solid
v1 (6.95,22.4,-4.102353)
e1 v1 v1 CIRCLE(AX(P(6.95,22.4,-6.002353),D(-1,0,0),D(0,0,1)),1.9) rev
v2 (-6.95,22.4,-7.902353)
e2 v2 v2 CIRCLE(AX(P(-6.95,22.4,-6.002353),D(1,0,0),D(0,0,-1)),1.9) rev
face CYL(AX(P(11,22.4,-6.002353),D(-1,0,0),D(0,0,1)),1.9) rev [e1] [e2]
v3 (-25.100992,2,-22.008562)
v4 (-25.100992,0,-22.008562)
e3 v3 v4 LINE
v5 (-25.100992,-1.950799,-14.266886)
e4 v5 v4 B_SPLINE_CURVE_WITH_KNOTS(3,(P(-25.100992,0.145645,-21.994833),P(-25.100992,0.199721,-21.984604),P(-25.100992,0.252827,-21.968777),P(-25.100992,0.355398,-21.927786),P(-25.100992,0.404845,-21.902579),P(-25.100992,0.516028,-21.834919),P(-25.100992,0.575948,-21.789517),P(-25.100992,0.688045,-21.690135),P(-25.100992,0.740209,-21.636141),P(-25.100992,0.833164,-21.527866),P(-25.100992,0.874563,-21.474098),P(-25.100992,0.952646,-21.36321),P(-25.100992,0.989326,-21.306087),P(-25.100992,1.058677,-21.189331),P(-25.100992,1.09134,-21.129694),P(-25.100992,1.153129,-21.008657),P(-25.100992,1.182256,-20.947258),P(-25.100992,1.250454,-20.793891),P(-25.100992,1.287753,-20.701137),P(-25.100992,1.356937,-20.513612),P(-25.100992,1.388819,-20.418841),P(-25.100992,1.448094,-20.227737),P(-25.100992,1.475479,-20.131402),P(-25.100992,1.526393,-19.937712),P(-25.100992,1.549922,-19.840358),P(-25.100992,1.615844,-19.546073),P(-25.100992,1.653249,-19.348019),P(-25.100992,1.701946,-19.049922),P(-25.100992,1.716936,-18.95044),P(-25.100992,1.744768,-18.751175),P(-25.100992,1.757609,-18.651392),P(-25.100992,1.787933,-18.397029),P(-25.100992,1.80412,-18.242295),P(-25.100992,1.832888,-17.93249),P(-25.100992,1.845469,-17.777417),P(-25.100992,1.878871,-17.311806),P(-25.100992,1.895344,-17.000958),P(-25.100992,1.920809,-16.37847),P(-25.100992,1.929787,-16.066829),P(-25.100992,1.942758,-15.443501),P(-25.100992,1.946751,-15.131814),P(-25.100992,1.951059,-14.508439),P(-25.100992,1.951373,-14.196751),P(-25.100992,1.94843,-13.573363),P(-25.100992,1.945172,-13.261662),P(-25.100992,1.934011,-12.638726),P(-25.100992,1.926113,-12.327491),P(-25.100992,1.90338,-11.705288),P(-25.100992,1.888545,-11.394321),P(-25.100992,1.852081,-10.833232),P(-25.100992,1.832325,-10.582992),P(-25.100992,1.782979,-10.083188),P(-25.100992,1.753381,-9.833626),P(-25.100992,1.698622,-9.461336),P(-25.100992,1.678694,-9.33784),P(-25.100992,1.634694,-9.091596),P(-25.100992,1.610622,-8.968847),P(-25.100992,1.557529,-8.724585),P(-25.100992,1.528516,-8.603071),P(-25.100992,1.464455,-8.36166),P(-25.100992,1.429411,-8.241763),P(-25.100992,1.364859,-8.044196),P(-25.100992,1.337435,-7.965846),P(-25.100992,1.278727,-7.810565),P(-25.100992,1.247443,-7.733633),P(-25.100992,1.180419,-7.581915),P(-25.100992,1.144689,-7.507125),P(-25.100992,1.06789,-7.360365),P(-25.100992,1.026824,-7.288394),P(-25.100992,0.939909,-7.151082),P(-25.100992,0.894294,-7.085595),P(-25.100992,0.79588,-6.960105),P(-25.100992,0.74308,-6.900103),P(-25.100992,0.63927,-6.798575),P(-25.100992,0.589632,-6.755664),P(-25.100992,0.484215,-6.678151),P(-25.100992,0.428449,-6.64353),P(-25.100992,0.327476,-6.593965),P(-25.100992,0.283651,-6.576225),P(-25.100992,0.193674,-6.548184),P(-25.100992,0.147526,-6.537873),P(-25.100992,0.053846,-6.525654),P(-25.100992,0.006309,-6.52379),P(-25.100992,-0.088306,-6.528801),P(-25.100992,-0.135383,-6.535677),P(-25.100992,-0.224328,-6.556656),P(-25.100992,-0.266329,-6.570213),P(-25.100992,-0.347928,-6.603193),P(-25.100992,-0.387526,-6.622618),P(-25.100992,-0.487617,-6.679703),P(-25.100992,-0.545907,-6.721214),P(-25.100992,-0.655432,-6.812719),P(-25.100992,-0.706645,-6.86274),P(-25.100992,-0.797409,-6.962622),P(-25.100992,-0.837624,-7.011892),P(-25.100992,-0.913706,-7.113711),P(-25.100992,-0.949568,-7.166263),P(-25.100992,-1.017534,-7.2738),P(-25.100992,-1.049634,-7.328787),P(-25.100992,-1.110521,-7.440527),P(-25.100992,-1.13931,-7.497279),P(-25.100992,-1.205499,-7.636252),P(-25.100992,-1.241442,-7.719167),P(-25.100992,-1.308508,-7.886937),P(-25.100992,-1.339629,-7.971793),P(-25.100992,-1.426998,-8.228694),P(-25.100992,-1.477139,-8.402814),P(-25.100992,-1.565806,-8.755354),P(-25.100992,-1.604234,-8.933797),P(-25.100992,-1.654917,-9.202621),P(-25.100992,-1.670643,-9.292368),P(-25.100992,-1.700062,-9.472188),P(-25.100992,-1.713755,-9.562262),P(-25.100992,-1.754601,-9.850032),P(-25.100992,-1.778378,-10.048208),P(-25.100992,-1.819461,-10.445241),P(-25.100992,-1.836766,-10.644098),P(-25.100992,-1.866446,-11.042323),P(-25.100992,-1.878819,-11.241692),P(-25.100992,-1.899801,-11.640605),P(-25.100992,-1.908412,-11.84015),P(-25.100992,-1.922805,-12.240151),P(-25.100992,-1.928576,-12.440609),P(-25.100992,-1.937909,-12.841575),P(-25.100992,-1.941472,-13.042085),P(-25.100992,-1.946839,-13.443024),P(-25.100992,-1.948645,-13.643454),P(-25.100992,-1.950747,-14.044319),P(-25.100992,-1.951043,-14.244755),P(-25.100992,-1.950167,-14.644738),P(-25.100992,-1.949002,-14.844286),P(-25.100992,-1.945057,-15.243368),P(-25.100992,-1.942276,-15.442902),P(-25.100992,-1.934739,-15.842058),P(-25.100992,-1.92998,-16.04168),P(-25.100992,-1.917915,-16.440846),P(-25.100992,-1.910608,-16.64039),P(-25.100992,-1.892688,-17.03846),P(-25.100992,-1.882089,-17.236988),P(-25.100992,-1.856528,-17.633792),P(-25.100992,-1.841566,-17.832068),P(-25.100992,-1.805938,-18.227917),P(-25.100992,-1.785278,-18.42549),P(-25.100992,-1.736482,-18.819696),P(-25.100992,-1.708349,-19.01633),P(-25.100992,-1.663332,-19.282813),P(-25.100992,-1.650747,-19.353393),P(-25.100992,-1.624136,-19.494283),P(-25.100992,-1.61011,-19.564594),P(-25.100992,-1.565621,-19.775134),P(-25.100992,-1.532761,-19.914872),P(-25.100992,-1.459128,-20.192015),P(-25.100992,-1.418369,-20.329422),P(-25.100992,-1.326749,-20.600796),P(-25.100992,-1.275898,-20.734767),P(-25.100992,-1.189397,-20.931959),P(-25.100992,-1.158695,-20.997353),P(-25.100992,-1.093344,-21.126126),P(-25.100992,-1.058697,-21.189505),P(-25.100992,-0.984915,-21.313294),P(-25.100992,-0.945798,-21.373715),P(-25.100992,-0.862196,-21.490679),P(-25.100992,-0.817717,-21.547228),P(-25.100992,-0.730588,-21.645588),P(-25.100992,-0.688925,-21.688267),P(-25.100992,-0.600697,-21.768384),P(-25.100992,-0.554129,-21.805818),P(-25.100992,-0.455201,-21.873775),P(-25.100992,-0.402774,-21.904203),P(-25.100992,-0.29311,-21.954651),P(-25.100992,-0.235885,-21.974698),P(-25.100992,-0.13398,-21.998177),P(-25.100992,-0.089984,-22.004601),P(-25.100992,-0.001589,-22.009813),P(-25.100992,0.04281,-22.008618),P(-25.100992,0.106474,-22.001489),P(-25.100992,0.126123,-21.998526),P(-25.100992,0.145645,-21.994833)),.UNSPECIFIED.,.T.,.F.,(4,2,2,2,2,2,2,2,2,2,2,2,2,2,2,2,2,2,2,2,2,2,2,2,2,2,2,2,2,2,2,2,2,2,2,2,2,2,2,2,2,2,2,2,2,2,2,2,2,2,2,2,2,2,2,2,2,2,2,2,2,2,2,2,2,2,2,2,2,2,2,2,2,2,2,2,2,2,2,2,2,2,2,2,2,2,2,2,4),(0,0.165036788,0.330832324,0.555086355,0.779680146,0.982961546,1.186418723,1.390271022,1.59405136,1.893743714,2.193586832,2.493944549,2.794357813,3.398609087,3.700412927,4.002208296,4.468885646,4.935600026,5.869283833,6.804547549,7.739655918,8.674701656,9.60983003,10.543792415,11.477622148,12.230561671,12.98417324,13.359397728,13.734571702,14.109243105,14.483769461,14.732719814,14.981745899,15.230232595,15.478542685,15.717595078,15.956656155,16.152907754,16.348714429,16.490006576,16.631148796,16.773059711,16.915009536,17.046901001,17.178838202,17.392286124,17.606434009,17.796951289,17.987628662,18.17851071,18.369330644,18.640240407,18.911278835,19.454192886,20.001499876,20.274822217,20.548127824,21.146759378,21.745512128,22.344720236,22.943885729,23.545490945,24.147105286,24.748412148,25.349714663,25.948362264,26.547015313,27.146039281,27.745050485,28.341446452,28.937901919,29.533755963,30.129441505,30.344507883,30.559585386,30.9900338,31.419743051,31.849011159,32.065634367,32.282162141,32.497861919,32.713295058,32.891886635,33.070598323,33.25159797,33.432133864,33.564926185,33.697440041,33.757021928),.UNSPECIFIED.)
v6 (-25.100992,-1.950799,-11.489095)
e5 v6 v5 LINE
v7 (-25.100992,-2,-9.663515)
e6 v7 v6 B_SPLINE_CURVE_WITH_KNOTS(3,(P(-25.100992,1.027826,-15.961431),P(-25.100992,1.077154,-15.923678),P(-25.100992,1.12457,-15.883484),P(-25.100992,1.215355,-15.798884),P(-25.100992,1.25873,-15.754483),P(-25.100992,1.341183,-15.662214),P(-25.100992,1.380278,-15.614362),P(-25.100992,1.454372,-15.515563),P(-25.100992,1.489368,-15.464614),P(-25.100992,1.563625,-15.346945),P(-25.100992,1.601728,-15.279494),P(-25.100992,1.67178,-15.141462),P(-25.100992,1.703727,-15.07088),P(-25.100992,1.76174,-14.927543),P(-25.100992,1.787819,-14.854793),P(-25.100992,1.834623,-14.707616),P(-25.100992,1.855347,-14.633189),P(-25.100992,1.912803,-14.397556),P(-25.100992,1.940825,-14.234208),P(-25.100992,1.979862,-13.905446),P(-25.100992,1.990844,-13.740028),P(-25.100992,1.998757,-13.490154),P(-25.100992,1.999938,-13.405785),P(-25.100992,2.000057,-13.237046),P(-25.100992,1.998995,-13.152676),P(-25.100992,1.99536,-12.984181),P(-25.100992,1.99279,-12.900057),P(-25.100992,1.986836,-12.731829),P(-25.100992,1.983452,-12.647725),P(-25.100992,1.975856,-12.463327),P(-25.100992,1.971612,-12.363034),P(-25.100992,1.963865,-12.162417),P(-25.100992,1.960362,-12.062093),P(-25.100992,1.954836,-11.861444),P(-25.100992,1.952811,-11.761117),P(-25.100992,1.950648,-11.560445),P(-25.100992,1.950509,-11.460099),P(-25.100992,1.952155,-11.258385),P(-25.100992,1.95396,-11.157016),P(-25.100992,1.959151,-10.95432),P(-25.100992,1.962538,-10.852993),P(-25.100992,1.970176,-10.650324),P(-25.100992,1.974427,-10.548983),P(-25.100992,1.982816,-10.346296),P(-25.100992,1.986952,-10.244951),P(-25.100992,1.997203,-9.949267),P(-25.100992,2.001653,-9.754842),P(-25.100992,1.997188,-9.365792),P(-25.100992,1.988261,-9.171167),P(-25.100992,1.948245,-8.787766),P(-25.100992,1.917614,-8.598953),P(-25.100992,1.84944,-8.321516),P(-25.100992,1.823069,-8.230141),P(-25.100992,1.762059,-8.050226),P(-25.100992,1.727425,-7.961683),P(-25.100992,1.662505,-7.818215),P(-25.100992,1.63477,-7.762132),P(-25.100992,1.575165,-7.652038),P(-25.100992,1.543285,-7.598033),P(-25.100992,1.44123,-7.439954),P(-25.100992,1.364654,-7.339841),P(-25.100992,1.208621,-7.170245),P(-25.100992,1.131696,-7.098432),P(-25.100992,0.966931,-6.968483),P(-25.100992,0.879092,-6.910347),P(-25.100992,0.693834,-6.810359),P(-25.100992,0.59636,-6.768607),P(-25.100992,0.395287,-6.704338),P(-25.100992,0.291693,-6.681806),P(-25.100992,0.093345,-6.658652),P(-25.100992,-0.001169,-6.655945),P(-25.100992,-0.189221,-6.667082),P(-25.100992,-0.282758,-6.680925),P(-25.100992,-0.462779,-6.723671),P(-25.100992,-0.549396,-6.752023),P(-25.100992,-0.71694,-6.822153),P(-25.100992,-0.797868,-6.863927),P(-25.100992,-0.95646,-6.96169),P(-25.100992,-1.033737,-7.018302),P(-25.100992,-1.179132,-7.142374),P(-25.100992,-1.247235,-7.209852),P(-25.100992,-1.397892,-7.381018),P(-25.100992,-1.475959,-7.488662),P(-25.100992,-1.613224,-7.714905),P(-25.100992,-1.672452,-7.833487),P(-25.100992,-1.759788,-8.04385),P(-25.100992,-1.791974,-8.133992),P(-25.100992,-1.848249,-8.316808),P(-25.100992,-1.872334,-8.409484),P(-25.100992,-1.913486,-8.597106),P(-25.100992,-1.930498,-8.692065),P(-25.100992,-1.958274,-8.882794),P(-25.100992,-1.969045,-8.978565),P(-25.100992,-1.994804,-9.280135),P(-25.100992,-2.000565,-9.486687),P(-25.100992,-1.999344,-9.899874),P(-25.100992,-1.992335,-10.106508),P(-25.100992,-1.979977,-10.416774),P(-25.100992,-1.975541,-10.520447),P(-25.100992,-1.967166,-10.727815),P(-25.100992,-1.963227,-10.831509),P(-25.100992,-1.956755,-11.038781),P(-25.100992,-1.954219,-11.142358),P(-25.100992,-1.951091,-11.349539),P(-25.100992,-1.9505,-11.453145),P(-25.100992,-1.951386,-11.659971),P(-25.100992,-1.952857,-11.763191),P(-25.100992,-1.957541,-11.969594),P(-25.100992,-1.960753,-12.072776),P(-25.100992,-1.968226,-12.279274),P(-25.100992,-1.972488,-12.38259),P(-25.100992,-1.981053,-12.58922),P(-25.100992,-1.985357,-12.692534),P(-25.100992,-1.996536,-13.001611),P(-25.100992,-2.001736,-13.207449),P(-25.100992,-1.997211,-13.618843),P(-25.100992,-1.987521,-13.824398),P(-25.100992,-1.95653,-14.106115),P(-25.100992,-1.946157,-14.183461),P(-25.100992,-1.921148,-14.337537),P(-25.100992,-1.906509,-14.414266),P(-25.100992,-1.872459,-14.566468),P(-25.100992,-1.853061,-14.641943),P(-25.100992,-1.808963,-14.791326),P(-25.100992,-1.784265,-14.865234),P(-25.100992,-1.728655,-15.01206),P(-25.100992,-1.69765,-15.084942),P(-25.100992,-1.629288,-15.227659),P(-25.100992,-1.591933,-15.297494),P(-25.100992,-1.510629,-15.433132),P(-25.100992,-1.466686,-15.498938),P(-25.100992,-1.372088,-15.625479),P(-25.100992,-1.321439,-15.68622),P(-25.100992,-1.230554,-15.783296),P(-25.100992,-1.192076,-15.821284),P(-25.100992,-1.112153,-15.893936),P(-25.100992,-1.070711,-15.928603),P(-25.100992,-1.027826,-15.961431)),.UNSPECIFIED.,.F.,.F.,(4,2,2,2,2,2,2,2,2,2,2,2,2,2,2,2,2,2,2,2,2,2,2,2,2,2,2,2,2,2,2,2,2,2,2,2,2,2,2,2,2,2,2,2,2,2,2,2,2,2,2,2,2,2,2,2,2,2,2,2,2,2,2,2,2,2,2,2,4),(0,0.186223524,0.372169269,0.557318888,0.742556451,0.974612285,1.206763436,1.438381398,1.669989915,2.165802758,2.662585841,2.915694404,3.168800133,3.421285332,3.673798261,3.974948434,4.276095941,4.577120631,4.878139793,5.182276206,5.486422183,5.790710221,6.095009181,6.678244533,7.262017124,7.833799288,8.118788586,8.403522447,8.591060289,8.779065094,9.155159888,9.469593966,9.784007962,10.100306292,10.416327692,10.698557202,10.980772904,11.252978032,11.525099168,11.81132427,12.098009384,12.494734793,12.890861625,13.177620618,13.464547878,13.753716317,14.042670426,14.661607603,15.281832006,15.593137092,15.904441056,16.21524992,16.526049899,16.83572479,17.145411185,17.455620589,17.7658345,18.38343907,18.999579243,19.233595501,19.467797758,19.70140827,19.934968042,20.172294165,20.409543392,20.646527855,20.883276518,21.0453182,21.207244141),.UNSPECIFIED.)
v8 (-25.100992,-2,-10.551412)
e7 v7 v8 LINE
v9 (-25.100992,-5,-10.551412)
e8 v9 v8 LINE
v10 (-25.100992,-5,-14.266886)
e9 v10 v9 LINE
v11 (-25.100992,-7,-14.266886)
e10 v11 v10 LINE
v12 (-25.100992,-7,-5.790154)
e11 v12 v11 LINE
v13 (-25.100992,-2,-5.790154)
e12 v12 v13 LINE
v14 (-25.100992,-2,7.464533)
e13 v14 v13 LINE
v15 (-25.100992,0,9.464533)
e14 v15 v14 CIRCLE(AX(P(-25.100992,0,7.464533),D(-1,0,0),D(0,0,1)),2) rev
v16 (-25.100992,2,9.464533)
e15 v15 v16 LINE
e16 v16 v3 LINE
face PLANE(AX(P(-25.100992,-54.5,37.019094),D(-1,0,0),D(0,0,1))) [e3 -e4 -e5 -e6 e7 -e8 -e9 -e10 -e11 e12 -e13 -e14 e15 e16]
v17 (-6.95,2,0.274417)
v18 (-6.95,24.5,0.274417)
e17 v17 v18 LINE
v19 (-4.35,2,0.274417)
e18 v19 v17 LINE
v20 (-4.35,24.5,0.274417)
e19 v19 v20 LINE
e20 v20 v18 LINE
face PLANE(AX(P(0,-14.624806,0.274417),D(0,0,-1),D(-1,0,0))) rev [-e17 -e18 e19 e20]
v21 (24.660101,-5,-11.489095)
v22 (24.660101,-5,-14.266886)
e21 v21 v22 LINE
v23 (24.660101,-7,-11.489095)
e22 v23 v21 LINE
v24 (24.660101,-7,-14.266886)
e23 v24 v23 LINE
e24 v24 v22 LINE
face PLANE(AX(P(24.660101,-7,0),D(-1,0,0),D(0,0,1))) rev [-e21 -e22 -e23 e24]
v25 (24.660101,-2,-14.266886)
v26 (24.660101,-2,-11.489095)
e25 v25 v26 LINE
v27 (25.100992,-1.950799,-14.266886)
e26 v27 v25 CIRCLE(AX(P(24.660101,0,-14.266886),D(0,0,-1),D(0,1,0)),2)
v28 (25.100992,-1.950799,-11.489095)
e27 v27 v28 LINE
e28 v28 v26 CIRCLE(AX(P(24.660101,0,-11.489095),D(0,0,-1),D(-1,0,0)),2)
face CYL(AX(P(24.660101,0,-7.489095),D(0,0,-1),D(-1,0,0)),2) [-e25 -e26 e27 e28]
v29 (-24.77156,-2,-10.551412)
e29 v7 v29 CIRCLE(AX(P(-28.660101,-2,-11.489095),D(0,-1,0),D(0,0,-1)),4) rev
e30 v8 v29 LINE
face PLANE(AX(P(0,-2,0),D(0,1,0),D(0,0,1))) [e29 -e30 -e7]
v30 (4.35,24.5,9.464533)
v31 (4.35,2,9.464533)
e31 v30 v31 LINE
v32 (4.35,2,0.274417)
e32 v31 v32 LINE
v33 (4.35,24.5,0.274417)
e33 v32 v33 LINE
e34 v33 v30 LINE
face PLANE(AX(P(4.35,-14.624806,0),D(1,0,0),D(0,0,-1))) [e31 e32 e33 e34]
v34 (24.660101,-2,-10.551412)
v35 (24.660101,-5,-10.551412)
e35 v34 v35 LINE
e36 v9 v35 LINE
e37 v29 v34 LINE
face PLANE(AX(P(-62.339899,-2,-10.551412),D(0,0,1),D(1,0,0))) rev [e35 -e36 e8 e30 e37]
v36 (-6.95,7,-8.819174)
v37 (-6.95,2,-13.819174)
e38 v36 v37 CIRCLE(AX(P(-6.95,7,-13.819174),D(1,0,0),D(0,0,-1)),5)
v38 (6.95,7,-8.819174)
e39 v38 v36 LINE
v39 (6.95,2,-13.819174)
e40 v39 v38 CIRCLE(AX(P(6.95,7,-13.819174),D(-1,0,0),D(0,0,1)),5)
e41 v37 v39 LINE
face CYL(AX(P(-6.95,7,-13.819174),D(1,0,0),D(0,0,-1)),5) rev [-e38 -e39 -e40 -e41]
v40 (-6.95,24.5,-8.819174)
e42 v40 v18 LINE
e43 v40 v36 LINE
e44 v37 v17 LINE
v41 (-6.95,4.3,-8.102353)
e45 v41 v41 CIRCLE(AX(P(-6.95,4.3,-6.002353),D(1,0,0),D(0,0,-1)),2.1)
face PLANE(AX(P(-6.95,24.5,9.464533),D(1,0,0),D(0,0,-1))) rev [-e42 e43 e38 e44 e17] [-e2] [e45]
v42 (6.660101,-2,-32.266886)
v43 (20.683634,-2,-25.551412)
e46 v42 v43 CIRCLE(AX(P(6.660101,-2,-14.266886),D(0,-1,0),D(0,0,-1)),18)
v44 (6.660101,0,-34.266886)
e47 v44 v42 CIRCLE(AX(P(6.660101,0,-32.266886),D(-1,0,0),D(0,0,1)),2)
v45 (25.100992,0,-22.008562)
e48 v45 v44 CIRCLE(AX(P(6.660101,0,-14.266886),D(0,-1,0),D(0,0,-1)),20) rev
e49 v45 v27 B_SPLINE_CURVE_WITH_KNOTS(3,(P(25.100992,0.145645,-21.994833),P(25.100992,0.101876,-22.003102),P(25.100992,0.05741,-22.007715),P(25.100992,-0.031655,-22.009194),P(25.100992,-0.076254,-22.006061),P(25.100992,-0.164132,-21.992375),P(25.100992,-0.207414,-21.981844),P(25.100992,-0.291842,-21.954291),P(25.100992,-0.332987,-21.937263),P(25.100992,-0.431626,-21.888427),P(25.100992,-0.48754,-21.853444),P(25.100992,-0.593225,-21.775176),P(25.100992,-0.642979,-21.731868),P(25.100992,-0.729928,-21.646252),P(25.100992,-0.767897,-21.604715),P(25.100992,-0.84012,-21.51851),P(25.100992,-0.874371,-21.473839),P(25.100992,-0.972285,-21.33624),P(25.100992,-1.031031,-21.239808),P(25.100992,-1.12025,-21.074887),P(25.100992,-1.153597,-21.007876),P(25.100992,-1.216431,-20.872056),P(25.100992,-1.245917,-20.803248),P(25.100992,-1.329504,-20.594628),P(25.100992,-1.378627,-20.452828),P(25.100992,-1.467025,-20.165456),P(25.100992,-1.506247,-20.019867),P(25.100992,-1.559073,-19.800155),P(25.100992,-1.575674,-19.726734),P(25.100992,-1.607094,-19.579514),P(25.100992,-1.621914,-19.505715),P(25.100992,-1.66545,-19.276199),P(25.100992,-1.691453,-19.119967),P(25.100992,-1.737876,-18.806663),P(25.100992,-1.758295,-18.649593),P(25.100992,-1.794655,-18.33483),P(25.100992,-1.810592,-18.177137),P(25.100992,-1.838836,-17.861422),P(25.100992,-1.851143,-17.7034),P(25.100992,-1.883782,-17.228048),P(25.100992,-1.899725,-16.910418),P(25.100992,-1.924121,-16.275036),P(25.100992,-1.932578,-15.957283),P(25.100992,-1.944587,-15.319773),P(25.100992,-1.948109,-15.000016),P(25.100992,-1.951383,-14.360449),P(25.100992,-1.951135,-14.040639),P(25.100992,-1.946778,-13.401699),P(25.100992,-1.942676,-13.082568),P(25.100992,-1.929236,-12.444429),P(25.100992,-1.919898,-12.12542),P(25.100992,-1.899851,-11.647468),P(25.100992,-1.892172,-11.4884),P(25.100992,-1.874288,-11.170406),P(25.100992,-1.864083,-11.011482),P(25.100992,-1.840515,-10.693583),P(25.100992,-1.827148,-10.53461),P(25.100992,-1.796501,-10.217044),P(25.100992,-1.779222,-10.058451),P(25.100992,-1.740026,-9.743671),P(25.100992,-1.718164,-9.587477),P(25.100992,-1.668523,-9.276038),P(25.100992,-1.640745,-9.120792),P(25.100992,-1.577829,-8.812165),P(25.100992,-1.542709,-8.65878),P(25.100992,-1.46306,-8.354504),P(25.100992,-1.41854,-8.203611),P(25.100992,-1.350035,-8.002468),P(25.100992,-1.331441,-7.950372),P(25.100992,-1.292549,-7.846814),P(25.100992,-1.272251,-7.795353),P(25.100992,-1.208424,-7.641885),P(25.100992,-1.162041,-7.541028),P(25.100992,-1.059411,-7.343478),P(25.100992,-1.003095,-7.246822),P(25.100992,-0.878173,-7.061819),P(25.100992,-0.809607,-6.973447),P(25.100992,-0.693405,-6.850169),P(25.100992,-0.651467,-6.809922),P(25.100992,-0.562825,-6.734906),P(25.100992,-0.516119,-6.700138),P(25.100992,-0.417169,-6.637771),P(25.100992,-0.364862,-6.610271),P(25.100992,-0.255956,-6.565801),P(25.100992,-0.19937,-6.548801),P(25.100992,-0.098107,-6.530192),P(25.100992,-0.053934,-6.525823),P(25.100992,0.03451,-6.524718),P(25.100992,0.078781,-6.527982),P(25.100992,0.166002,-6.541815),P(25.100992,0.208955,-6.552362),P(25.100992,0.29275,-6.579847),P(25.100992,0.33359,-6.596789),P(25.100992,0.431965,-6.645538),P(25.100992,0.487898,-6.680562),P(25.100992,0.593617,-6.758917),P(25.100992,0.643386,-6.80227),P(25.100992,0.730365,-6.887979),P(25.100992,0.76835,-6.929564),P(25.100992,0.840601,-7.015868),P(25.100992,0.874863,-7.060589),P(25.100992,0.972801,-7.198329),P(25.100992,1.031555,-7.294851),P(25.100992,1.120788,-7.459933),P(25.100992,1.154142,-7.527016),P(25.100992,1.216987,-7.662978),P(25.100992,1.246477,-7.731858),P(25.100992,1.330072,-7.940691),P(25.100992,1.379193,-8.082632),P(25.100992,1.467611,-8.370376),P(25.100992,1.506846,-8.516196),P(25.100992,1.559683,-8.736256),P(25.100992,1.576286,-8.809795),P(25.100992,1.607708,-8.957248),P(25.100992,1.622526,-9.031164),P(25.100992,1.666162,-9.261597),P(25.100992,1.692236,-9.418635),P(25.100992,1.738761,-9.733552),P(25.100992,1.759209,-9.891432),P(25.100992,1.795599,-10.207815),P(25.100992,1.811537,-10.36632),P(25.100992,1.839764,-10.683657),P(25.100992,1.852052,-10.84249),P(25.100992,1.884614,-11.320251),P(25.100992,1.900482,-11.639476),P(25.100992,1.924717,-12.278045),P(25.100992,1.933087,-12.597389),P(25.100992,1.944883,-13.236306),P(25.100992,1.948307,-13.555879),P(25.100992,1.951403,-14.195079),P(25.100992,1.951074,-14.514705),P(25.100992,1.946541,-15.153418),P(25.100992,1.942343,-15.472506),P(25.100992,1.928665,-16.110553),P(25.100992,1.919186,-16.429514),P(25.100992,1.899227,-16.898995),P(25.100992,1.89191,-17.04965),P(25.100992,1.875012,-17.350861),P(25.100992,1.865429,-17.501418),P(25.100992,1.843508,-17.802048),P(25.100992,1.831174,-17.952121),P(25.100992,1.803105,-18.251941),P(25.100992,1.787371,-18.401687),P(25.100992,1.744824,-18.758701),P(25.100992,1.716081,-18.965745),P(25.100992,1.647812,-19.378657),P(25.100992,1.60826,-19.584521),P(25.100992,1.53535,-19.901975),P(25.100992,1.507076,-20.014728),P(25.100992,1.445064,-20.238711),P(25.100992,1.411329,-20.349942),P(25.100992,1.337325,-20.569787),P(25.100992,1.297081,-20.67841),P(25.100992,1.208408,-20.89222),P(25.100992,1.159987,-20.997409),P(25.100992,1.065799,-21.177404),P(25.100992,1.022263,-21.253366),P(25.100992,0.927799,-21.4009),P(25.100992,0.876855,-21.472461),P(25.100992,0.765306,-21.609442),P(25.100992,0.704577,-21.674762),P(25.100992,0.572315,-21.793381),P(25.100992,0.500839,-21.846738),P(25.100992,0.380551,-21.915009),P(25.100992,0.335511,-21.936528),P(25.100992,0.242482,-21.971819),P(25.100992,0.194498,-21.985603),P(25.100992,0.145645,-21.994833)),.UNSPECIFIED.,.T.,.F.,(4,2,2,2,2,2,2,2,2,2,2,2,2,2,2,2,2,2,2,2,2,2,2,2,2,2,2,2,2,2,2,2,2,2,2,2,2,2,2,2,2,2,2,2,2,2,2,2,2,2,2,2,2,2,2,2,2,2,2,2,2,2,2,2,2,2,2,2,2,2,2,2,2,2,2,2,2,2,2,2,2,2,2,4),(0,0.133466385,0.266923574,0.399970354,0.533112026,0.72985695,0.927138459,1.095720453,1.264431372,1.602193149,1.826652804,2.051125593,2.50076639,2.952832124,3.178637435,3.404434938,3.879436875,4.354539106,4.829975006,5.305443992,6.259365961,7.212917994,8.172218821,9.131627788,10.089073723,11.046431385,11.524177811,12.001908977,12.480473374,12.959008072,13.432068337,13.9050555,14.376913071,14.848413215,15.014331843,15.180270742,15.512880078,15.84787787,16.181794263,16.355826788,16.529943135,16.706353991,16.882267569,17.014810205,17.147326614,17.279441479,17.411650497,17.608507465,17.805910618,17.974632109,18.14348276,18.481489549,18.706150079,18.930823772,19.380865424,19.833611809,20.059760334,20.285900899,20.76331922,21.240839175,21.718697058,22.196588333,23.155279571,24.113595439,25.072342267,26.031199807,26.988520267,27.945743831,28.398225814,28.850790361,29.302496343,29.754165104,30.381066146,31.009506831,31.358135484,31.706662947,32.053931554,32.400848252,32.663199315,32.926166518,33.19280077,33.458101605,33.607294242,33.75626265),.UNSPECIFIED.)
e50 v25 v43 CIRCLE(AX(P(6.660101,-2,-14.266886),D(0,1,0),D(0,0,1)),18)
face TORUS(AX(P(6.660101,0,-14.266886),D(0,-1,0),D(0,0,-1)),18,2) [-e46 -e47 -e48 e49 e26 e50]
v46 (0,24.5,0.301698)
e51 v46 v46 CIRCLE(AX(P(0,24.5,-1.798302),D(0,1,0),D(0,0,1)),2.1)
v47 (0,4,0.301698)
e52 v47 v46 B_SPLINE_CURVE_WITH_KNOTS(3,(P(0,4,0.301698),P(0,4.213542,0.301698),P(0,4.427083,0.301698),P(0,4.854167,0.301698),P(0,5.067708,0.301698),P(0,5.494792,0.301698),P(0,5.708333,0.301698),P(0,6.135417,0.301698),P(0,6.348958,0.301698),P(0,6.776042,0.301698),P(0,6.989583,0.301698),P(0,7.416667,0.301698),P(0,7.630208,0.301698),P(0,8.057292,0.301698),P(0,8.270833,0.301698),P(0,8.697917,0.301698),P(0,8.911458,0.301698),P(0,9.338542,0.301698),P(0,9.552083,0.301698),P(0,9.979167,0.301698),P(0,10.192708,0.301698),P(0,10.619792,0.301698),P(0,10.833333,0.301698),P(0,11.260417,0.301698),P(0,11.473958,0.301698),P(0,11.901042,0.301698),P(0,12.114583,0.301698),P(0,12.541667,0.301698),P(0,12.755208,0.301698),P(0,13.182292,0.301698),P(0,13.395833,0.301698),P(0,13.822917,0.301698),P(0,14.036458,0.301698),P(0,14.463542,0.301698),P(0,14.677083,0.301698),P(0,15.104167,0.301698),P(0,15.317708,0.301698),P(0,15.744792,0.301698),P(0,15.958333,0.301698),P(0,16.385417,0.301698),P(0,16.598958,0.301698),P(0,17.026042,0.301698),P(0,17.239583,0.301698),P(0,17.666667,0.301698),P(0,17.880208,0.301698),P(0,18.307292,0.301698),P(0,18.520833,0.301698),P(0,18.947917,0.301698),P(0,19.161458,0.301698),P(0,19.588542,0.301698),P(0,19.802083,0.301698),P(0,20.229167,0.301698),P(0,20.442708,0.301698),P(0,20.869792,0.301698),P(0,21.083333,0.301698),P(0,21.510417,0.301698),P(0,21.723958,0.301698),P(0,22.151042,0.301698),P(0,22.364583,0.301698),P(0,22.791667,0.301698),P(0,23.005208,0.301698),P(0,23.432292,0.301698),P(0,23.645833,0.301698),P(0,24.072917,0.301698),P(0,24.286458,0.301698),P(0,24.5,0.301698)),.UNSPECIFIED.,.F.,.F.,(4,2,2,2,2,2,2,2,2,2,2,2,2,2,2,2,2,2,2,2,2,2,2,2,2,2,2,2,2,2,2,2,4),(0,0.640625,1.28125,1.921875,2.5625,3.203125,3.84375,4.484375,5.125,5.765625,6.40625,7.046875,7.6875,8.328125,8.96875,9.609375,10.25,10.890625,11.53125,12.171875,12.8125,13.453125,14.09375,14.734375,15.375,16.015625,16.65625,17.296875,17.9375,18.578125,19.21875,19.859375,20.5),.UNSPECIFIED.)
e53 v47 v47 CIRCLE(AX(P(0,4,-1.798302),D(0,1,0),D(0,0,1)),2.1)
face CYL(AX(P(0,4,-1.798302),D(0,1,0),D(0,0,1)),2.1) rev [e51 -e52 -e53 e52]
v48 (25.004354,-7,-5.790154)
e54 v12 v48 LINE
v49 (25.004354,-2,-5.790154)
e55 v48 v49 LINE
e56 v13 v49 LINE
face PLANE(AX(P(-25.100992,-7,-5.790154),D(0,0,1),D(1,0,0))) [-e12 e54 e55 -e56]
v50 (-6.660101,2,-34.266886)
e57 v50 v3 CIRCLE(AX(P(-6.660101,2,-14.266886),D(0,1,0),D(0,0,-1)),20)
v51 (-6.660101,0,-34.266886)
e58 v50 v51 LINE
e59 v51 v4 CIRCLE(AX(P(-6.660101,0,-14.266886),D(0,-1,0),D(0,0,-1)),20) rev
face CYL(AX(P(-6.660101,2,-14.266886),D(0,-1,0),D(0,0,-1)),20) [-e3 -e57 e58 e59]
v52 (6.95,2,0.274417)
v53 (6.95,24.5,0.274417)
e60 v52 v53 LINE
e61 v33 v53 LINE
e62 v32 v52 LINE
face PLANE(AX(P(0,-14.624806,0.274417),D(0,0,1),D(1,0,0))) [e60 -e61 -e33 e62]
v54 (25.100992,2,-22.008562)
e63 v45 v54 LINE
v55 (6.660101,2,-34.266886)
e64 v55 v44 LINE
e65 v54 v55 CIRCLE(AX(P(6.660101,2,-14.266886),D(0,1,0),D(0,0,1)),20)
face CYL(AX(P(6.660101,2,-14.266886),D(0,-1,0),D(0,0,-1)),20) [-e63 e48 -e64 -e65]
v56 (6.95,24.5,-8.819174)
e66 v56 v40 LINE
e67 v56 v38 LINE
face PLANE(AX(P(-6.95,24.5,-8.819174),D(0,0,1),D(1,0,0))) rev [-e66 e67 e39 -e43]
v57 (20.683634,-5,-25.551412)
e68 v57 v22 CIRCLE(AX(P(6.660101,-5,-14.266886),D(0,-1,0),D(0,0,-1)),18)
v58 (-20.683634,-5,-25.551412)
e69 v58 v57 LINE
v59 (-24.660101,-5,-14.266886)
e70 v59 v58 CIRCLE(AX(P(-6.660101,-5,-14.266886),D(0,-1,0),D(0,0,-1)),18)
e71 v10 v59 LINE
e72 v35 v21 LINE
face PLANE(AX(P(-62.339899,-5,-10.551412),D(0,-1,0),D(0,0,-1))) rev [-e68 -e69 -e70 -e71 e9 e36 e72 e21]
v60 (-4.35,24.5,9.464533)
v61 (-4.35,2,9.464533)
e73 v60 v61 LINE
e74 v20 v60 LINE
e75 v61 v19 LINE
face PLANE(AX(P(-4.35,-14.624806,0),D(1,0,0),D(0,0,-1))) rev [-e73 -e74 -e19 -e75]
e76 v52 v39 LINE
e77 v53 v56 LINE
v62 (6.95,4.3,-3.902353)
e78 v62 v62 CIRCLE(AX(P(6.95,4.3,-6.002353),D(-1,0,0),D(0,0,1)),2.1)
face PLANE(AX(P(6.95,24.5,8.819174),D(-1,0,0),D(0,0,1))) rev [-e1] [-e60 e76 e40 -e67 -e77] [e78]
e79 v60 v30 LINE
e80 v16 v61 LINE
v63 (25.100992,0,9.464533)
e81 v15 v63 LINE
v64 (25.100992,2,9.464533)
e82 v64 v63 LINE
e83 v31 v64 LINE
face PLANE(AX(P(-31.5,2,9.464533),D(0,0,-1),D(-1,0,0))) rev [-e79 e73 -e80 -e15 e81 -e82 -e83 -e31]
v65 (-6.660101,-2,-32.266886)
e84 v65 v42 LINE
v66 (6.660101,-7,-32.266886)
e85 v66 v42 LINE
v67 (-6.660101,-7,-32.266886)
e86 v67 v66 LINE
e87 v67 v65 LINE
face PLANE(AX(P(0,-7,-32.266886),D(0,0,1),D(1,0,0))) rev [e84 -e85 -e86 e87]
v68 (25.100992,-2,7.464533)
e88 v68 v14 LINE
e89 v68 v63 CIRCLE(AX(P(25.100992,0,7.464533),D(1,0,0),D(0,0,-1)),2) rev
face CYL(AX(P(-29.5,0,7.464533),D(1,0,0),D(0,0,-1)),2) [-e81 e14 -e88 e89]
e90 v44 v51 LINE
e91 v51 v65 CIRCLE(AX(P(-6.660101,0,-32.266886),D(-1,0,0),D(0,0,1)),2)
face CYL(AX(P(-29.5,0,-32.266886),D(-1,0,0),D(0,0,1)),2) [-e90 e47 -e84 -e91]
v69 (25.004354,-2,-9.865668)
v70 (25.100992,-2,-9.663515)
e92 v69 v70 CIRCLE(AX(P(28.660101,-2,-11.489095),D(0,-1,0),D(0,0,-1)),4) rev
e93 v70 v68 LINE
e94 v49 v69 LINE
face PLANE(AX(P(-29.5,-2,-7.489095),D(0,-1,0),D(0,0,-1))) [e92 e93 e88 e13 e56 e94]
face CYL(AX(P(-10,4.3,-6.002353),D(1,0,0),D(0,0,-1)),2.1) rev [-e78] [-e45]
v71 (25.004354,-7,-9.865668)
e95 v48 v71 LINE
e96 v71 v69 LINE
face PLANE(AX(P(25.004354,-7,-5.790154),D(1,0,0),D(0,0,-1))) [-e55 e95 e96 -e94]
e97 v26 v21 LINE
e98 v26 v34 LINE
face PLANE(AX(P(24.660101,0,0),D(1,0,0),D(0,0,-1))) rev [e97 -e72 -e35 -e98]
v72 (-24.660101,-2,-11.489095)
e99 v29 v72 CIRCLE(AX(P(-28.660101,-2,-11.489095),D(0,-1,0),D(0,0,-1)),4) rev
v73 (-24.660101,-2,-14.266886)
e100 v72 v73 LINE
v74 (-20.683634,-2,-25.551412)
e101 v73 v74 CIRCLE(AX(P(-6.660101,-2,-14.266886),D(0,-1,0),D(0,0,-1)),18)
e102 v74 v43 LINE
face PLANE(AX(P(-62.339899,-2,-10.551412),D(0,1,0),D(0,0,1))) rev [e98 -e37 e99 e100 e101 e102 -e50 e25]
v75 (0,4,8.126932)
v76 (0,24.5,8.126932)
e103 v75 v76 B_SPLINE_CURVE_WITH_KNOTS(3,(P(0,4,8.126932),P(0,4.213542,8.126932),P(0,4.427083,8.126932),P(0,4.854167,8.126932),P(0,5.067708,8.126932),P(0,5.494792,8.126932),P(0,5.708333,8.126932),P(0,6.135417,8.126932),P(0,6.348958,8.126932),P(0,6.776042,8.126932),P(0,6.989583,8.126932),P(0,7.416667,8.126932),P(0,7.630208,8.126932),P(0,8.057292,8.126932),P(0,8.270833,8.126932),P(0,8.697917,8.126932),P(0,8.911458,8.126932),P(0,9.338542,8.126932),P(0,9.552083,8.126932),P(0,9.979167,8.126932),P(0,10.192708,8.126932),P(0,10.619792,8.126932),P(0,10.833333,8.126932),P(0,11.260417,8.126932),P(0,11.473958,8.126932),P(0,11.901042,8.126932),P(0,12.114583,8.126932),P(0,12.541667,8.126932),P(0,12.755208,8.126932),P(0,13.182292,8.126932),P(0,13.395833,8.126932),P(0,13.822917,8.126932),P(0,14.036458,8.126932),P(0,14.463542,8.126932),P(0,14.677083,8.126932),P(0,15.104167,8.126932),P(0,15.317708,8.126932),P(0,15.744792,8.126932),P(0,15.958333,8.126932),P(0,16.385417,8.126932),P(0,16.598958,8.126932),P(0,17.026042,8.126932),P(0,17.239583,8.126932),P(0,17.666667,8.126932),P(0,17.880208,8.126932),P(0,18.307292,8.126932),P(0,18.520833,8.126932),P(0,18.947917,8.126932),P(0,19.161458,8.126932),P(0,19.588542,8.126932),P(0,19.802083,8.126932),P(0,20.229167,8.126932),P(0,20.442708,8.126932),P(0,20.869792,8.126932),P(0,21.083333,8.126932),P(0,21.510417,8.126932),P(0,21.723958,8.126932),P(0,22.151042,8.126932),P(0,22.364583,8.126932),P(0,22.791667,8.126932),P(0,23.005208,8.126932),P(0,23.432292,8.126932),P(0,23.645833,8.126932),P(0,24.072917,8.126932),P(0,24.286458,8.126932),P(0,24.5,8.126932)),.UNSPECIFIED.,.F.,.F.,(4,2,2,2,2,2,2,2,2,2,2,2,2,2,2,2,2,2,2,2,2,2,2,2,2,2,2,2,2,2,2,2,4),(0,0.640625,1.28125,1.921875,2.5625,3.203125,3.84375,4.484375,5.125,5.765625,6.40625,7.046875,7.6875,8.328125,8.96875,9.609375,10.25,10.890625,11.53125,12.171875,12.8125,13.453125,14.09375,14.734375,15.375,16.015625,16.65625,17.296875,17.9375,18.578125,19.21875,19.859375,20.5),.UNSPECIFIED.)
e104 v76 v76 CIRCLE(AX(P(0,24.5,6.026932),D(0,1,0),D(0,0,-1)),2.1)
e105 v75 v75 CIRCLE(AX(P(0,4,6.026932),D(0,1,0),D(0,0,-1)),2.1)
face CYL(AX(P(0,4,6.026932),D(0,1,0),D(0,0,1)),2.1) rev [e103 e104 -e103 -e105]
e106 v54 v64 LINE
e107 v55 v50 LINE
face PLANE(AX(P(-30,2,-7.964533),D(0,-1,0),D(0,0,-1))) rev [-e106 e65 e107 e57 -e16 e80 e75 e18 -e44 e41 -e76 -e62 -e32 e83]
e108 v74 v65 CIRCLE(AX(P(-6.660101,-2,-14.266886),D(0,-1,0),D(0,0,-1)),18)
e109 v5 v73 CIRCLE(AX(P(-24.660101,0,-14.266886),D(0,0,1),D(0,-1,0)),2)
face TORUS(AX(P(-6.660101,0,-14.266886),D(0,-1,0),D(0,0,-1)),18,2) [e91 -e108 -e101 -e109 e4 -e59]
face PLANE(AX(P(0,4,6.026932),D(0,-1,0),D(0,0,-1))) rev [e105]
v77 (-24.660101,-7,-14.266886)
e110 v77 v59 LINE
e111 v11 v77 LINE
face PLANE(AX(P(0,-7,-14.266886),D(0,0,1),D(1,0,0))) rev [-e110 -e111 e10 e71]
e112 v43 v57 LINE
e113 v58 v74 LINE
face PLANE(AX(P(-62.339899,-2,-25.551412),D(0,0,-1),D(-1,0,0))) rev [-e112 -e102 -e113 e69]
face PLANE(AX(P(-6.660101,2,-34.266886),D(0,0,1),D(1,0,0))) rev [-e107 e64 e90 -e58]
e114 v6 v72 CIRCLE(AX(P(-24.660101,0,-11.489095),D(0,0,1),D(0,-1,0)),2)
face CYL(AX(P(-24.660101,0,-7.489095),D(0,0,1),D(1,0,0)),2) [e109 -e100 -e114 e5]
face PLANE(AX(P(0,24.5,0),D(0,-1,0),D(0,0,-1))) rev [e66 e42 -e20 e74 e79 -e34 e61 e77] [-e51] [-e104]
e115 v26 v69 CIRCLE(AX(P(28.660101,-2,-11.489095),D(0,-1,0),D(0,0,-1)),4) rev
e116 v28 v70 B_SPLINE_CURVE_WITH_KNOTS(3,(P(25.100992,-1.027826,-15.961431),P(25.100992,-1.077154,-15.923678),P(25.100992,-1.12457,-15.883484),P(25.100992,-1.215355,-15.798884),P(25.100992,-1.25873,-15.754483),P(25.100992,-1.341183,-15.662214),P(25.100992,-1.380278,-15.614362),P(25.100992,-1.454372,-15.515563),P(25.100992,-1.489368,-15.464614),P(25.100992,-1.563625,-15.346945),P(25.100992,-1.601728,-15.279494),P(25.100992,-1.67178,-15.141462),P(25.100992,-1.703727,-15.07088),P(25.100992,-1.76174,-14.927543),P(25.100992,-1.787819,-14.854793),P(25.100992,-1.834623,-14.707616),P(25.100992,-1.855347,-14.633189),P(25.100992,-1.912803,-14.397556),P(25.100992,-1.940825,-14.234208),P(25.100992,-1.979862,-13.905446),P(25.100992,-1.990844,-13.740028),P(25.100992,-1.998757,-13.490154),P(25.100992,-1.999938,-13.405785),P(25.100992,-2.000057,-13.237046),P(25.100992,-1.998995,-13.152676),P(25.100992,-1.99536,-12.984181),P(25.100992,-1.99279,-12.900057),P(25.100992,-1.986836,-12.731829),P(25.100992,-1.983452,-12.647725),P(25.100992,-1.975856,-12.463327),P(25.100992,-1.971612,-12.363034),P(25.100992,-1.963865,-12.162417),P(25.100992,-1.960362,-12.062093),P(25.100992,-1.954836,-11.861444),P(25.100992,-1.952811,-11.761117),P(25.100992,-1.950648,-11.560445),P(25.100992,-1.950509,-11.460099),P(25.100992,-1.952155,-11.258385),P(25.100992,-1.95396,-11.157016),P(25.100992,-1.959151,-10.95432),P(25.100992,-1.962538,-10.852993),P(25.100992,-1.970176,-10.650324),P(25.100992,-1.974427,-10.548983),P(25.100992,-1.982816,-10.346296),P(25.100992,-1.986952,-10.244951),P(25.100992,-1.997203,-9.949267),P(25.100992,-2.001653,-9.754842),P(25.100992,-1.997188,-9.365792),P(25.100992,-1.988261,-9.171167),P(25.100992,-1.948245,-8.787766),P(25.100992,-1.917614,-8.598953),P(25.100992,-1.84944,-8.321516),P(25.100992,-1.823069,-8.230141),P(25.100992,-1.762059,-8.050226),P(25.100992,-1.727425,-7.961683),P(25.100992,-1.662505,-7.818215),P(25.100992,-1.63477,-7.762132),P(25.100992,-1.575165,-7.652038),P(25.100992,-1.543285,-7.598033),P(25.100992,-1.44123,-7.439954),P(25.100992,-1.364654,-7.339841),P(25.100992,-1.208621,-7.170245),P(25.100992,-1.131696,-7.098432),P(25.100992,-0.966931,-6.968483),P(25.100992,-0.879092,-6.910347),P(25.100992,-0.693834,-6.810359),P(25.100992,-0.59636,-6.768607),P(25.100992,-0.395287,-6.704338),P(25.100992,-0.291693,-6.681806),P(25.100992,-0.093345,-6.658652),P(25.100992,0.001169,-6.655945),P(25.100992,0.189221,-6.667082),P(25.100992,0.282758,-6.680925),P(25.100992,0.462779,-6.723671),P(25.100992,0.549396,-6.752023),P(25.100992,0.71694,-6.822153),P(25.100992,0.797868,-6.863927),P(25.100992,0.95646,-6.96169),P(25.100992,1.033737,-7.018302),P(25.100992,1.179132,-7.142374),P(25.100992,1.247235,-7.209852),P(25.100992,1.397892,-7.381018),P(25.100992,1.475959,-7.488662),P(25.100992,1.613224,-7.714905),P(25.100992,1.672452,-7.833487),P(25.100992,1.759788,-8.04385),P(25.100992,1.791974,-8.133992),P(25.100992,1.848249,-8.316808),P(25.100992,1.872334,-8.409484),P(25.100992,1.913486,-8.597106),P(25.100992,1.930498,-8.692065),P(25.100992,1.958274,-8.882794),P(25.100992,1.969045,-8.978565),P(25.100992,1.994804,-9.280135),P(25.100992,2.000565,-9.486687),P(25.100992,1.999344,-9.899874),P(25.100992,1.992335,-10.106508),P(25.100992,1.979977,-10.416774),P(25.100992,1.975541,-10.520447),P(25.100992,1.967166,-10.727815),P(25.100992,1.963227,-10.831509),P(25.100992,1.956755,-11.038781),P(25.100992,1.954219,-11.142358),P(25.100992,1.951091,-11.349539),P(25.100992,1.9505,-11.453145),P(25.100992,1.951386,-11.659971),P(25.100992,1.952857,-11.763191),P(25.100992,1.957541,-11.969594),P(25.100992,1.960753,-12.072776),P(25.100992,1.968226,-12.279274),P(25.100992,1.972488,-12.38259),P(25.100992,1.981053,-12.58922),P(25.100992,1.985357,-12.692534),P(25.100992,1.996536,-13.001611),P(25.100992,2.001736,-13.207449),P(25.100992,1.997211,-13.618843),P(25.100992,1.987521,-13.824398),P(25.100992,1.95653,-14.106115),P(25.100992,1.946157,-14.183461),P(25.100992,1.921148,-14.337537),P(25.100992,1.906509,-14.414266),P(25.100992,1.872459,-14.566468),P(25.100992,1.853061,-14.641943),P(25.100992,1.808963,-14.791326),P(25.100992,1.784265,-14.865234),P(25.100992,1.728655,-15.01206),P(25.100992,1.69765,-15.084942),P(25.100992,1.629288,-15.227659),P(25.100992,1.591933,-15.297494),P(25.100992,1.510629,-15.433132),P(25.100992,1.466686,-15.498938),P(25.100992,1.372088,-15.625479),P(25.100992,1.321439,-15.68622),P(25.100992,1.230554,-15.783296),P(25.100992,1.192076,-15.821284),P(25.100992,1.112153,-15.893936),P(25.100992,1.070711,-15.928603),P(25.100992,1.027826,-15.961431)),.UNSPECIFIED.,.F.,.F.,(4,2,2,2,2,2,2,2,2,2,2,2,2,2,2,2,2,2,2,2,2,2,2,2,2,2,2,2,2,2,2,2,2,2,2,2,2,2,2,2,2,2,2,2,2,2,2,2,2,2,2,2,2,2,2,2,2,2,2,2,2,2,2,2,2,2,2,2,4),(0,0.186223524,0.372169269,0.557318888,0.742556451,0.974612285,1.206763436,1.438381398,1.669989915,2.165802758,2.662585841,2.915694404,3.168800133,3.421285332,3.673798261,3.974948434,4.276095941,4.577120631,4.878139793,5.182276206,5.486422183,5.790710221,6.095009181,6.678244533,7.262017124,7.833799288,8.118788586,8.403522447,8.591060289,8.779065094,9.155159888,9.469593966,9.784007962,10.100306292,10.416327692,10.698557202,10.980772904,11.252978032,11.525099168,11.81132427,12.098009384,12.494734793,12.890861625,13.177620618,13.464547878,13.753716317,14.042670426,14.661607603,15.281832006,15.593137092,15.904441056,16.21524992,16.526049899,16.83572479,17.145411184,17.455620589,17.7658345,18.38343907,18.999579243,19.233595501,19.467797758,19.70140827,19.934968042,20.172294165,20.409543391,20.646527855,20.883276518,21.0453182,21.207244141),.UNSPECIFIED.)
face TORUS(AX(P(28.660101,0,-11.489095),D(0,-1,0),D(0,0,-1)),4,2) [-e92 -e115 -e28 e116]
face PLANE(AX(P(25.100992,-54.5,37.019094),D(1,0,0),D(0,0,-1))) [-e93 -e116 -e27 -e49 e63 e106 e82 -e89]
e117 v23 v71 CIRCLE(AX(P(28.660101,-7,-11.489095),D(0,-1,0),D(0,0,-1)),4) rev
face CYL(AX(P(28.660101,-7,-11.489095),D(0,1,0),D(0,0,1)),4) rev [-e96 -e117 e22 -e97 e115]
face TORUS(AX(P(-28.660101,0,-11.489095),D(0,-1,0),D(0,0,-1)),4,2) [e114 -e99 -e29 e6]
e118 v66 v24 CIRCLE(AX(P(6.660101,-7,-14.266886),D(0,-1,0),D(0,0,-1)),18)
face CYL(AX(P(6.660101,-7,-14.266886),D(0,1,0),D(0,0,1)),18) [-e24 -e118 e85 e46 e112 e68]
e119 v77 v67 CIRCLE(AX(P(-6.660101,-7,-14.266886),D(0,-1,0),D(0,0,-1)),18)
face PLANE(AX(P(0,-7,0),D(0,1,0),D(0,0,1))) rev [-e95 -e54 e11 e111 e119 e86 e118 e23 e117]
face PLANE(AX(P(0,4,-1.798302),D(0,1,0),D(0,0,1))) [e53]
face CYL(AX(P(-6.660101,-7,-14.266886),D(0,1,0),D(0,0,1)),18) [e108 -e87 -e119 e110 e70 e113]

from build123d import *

# Parameters (mm, degrees)
SALIENTE_EXTRUIR1_DEPTH     = 2
SALIENTE_EXTRUIR2_DEPTH     = 24.5
SALIENTE_EXTRUIR3_DEPTH     = 22.5
CORTAR_EXTRUIR1_DEPTH       = 27
CORTAR_EXTRUIR1_DEPTH_BACK  = 65.5
CROQUIS4_R                  = 1.599999999
REDONDEO1_R                 = 3
REDONDEO2_R                 = 5
SALIENTE_EXTRUIR5_START     = 2
SALIENTE_EXTRUIR5_DEPTH     = 2
CROQUIS16_W                 = 2.6
CROQUIS16_H                 = 16.420237112
CORTAR_EXTRUIR8_DEPTH       = 22.5
REDONDEO6_R                 = 2
REDONDEO7_R                 = 2
CROQUIS5_R                  = 2.1
CORTAR_EXTRUIR2_DEPTH       = 20.5
CROQUIS17_R                 = 2.1
CORTAR_EXTRUIR9_DEPTH       = 10
CORTAR_EXTRUIR14_DEPTH      = 11
CORTAR_EXTRUIR14_DEPTH_BACK = 10
CROQUIS18_R                 = 1.9
CROQUIS19_R                 = 18.5
CORTAR_EXTRUIR15_DEPTH      = 3.5
CORTAR_EXTRUIR16_START      = -56
CROQUIS20_R                 = 18.5
CORTAR_EXTRUIR16_DEPTH      = 3.5
CROQUIS21_W                 = 93.525691526
CROQUIS21_H                 = 152.705287602
CROQUIS21_W_2               = 50.201984064
CROQUIS21_H_2               = 74.038187446
CORTAR_EXTRUIR17_DEPTH      = 79
SALIENTE_EXTRUIR6_DEPTH     = 5
CROQUIS23_W                 = 15
CROQUIS23_H                 = 3
CORTAR_EXTRUIR18_DEPTH      = 87


# Read off the part's stored shape, not the designer's step: Saliente-Extruir6
with BuildPart() as part:
    # Croquis1 → Saliente-Extruir1 (new body)
    with BuildSketch(Plane(origin=(0, 0, 0), x_dir=(1, 0, 0), z_dir=(0, 1, 0))):
        with BuildLine():
            Line((-31.5, -9.464532567), (31.5, -9.464532567))
            Line((31.5, -9.464532567), (31.5, 7.964532567))
            ThreePointArc((31.5, 7.964532567), (31.060660172, 9.025192739), (30, 9.464532567))
            Line((30, 9.464532567), (28.160101256, 9.464532567))
            ThreePointArc((28.160101256, 9.464532567), (27.099441084, 9.903872396), (26.660101256, 10.964532567))
            Line((26.660101256, 10.964532567), (26.660101256, 14.266885585))
            ThreePointArc((26.660101256, 14.266885585), (20.802236879, 28.409021208), (6.660101256, 34.266885585))
            Line((6.660101256, 34.266885585), (-6.660101256, 34.266885585))
            ThreePointArc((-6.660101256, 34.266885585), (-20.802236879, 28.409021208), (-26.660101256, 14.266885585))
            Line((-26.660101256, 14.266885585), (-26.660101256, 10.964532567))
            ThreePointArc((-26.660101256, 10.964532567), (-27.099441084, 9.903872396), (-28.160101256, 9.464532567))
            Line((-28.160101256, 9.464532567), (-30, 9.464532567))
            ThreePointArc((-30, 9.464532567), (-31.060660172, 9.025192739), (-31.5, 7.964532567))
            Line((-31.5, 7.964532567), (-31.5, -9.464532567))
        make_face()
    extrude(amount=SALIENTE_EXTRUIR1_DEPTH)

    # Croquis2 → Saliente-Extruir2 (add)
    with BuildSketch(Plane(origin=(0, 0, 0), x_dir=(1, 0, 0), z_dir=(0, 1, 0))):
        Polygon((6.95, -8.819174125), (6.95, -9.464532567), (-6.95, -9.464532567), (-6.95, -8.819174125), (-6.95, 8.819174125), (6.95, 8.819174125), align=None)
    extrude(amount=SALIENTE_EXTRUIR2_DEPTH)

    # Croquis3 → Saliente-Extruir3 (add)
    with BuildSketch(Plane(origin=(0, 2, 0), x_dir=(1, 0, 0), z_dir=(0, 1, 0))):
        with BuildLine():
            ThreePointArc((28.160101256, 9.464532567), (27.375457574, 9.686121721), (26.822638598, 10.285420177))
            Line((26.822638598, 10.285420177), (25.6, 10.285420177))
            Line((25.6, 10.285420177), (25.6, -2.749999823))
            Line((25.6, -2.749999823), (31.5, -2.749999823))
            Line((31.5, -2.749999823), (31.5, 7.964532567))
            ThreePointArc((31.5, 7.964532567), (31.060660172, 9.025192739), (30, 9.464532567))
            Line((30, 9.464532567), (28.160101256, 9.464532567))
        make_face()
        with BuildLine():
            Line((-25.6, 10.285420177), (-26.822638598, 10.285420177))
            ThreePointArc((-26.822638598, 10.285420177), (-27.375457574, 9.686121721), (-28.160101256, 9.464532567))
            Line((-28.160101256, 9.464532567), (-30, 9.464532567))
            ThreePointArc((-30, 9.464532567), (-31.060660172, 9.025192739), (-31.5, 7.964532567))
            Line((-31.5, 7.964532567), (-31.5, -2.749999823))
            Line((-31.5, -2.749999823), (-25.6, -2.749999823))
            Line((-25.6, -2.749999823), (-25.6, 10.285420177))
        make_face()
    extrude(amount=SALIENTE_EXTRUIR3_DEPTH)

    # Croquis4 → Cortar-Extruir1 (cut, two sides: drawn at the far end of the back side and taken through both)
    with BuildSketch(Plane.ZY.offset(25.5).offset(-CORTAR_EXTRUIR1_DEPTH_BACK)):
        with Locations((-6.002353017, 4.3)):
            Circle(CROQUIS4_R)
        with Locations((-6.002353017, 22.4)):
            Circle(CROQUIS4_R)
    extrude(amount=CORTAR_EXTRUIR1_DEPTH + CORTAR_EXTRUIR1_DEPTH_BACK, mode=Mode.SUBTRACT)

    # Redondeo1
    redondeo1_edges = [part.edges().sort_by_distance(p)[0] for p in [
        (28.55, 2, 2.749999823),
    ]]
    fillet(redondeo1_edges, radius=REDONDEO1_R)

    # Redondeo2
    redondeo2_edges = [part.edges().sort_by_distance(p)[0] for p in [
        (0, 2, -8.819174125),
    ]]
    fillet(redondeo2_edges, radius=REDONDEO2_R)

    # Croquis15 → Saliente-Extruir5 (add)
    with BuildSketch(Plane.XZ.offset(SALIENTE_EXTRUIR5_START)):
        with BuildLine():
            Line((-31.5, 9.464532567), (31.5, 9.464532567))
            Line((31.5, 9.464532567), (31.5, -7.489095092))
            ThreePointArc((31.5, -7.489095092), (30.914213562, -8.903308654), (29.5, -9.489095092))
            Line((29.5, -9.489095092), (28.660101256, -9.489095092))
            ThreePointArc((28.660101256, -9.489095092), (27.245887693, -10.074881529), (26.660101256, -11.489095092))
            Line((26.660101256, -11.489095092), (26.660101256, -14.266885585))
            ThreePointArc((26.660101256, -14.266885585), (20.802236879, -28.409021208), (6.660101256, -34.266885585))
            Line((6.660101256, -34.266885585), (1.137553535, -34.266885585))
            Line((1.137553535, -34.266885585), (-1.137553535, -34.266885585))
            Line((-1.137553535, -34.266885585), (-6.660101256, -34.266885585))
            ThreePointArc((-6.660101256, -34.266885585), (-20.802236879, -28.409021208), (-26.660101256, -14.266885585))
            Line((-26.660101256, -14.266885585), (-26.660101256, -11.489095092))
            ThreePointArc((-26.660101256, -11.489095092), (-27.245887693, -10.074881529), (-28.660101256, -9.489095092))
            Line((-28.660101256, -9.489095092), (-29.5, -9.489095092))
            ThreePointArc((-29.5, -9.489095092), (-30.914213562, -8.903308654), (-31.5, -7.489095092))
            Line((-31.5, -7.489095092), (-31.5, 9.464532567))
        make_face()
    extrude(amount=-SALIENTE_EXTRUIR5_DEPTH)

    # Croquis16 → Cortar-Extruir8 (cut)
    with BuildSketch(Plane(origin=(0, 24.5, 0), x_dir=(1, 0, 0), z_dir=(0, 1, 0))):
        with Locations((5.65, -8.484535845)):
            Rectangle(CROQUIS16_W, CROQUIS16_H)
        with Locations((-5.65, -8.484535845)):
            Rectangle(CROQUIS16_W, CROQUIS16_H)
    extrude(amount=-CORTAR_EXTRUIR8_DEPTH, mode=Mode.SUBTRACT)

    # Redondeo6
    redondeo6_edges = [part.edges().sort_by_distance(p)[0] for p in [
        (-31.5, -2, 0.987718738),
        (-30.914213562, -2, -8.903308654),
        (-29.080050628, -2, -9.489095092),
        (-27.245887693, -2, -10.074881529),
        (-26.660101256, -2, -12.877990338),
        (-20.802236879, -2, -28.409021208),
        (0, -2, -34.266885585),
        (20.802236879, -2, -28.409021208),
        (26.660101256, -2, -12.877990338),
        (27.245887693, -2, -10.074881529),
        (29.080050628, -2, -9.489095092),
        (30.914213562, -2, -8.903308654),
        (31.5, -2, 0.987718738),
    ]]
    fillet(redondeo6_edges, radius=REDONDEO6_R - 0.0001)  # a hair under: the kernel refuses the full size

    # Redondeo7
    redondeo7_edges = [part.edges().sort_by_distance(p)[0] for p in [
        (0, -2, 9.464532567),
        (30.914242852, -1.414242852, 9.464532567),
        (-30.914242852, -1.414242852, 9.464532567),
        (31.5, 0.99995, 9.464532567),
        (-31.5, 0.99995, 9.464532567),
    ]]
    fillet(redondeo7_edges, radius=REDONDEO7_R - 0.0001)  # a hair under: the kernel refuses the full size

    # Croquis5 → Cortar-Extruir2 (cut)
    with BuildSketch(Plane(origin=(0, 24.5, 0), x_dir=(1, 0, 0), z_dir=(0, 1, 0))):
        with Locations(Location((0, 1.798301608, 0), (0, 0, 270))):
            Circle(CROQUIS5_R)
        with Locations(Location((0, -6.026932469, 0), (0, 0, 270))):
            Circle(CROQUIS5_R)
        with Locations(Location((-28.55, 1.798301608, 0), (0, 0, 270))):
            Circle(CROQUIS5_R)
        with Locations(Location((28.55, 1.798301608, 0), (0, 0, 270))):
            Circle(CROQUIS5_R)
    extrude(amount=-CORTAR_EXTRUIR2_DEPTH, mode=Mode.SUBTRACT)

    # Croquis17 → Cortar-Extruir9 (cut, symmetric)
    with BuildSketch(Plane(origin=(0, 0, 0), x_dir=(0, 0, -1), z_dir=(1, 0, 0))):
        with Locations((6.002353017, 4.3)):
            Circle(CROQUIS17_R)
    extrude(amount=CORTAR_EXTRUIR9_DEPTH, both=True, mode=Mode.SUBTRACT)

    # Croquis18 → Cortar-Extruir14 (cut, two sides: drawn at the far end of the back side and taken through both)
    with BuildSketch(Plane(origin=(0, 0, 0), x_dir=(0, 0, -1), z_dir=(1, 0, 0)).offset(-CORTAR_EXTRUIR14_DEPTH_BACK)):
        with Locations(Location((6.002353017, 22.4, 0), (0, 0, 180))):
            Circle(CROQUIS18_R)
    extrude(amount=CORTAR_EXTRUIR14_DEPTH + CORTAR_EXTRUIR14_DEPTH_BACK, mode=Mode.SUBTRACT)

    # Croquis19 → Cortar-Extruir15 (cut)
    with BuildSketch(Plane(origin=(31.5, 0, 0), x_dir=(0, 0, -1), z_dir=(1, 0, 0))):
        with Locations((25.179802512, 14.045485316)):
            Circle(CROQUIS19_R)
    extrude(amount=-CORTAR_EXTRUIR15_DEPTH, mode=Mode.SUBTRACT)

    # Croquis20 → Cortar-Extruir16 (cut)
    with BuildSketch(Plane(origin=(28, 0, 0), x_dir=(0, 0, -1), z_dir=(1, 0, 0)).offset(CORTAR_EXTRUIR16_START)):
        with Locations((25.179802512, 14.045485316)):
            Circle(CROQUIS20_R)
    extrude(amount=-CORTAR_EXTRUIR16_DEPTH, mode=Mode.SUBTRACT)

    # Croquis21 → Cortar-Extruir17 (cut)
    with BuildSketch(Plane(origin=(0, 24.5, 0), x_dir=(1, 0, 0), z_dir=(0, 1, 0))):
        Rectangle(CROQUIS21_W, CROQUIS21_H)
        Rectangle(CROQUIS21_W_2, CROQUIS21_H_2, mode=Mode.SUBTRACT)
    extrude(amount=-CORTAR_EXTRUIR17_DEPTH, mode=Mode.SUBTRACT)

    # Saliente-Extruir6 outline → Saliente-Extruir6 (add)
    with BuildSketch(Plane.XZ.offset(2)):
        with BuildLine():
            Line((25.004354391, -5.79015449), (-25.100992032, -5.79015449))
            Line((-25.100992032, -5.79015449), (-25.100992032, -14.266885585))
            Line((-25.100992032, -14.266885585), (-24.660101256, -14.266885585))
            ThreePointArc((-24.660101256, -14.266885585), (-19.388023317, -26.994807646), (-6.660101256, -32.266885585))
            Line((-6.660101256, -32.266885585), (6.660101256, -32.266885585))
            ThreePointArc((6.660101256, -32.266885585), (19.388023317, -26.994807646), (24.660101256, -14.266885585))
            Line((24.660101256, -14.266885585), (24.660101256, -11.489095092))
            ThreePointArc((24.660101256, -11.489095092), (24.747110874, -10.659332312), (25.004354391, -9.865668204))
            Line((25.004354391, -9.865668204), (25.004354391, -5.79015449))
        make_face()
    extrude(amount=SALIENTE_EXTRUIR6_DEPTH)

    # Croquis23 → Cortar-Extruir18 (cut)
    with BuildSketch(Plane(origin=(24.660101256, 0, 0), x_dir=(0, 0, -1), z_dir=(1, 0, 0))):
        with Locations((18.051411886, -3.5)):
            Rectangle(CROQUIS23_W, CROQUIS23_H)
    extrude(amount=-CORTAR_EXTRUIR18_DEPTH, mode=Mode.SUBTRACT)


solid = part.part
